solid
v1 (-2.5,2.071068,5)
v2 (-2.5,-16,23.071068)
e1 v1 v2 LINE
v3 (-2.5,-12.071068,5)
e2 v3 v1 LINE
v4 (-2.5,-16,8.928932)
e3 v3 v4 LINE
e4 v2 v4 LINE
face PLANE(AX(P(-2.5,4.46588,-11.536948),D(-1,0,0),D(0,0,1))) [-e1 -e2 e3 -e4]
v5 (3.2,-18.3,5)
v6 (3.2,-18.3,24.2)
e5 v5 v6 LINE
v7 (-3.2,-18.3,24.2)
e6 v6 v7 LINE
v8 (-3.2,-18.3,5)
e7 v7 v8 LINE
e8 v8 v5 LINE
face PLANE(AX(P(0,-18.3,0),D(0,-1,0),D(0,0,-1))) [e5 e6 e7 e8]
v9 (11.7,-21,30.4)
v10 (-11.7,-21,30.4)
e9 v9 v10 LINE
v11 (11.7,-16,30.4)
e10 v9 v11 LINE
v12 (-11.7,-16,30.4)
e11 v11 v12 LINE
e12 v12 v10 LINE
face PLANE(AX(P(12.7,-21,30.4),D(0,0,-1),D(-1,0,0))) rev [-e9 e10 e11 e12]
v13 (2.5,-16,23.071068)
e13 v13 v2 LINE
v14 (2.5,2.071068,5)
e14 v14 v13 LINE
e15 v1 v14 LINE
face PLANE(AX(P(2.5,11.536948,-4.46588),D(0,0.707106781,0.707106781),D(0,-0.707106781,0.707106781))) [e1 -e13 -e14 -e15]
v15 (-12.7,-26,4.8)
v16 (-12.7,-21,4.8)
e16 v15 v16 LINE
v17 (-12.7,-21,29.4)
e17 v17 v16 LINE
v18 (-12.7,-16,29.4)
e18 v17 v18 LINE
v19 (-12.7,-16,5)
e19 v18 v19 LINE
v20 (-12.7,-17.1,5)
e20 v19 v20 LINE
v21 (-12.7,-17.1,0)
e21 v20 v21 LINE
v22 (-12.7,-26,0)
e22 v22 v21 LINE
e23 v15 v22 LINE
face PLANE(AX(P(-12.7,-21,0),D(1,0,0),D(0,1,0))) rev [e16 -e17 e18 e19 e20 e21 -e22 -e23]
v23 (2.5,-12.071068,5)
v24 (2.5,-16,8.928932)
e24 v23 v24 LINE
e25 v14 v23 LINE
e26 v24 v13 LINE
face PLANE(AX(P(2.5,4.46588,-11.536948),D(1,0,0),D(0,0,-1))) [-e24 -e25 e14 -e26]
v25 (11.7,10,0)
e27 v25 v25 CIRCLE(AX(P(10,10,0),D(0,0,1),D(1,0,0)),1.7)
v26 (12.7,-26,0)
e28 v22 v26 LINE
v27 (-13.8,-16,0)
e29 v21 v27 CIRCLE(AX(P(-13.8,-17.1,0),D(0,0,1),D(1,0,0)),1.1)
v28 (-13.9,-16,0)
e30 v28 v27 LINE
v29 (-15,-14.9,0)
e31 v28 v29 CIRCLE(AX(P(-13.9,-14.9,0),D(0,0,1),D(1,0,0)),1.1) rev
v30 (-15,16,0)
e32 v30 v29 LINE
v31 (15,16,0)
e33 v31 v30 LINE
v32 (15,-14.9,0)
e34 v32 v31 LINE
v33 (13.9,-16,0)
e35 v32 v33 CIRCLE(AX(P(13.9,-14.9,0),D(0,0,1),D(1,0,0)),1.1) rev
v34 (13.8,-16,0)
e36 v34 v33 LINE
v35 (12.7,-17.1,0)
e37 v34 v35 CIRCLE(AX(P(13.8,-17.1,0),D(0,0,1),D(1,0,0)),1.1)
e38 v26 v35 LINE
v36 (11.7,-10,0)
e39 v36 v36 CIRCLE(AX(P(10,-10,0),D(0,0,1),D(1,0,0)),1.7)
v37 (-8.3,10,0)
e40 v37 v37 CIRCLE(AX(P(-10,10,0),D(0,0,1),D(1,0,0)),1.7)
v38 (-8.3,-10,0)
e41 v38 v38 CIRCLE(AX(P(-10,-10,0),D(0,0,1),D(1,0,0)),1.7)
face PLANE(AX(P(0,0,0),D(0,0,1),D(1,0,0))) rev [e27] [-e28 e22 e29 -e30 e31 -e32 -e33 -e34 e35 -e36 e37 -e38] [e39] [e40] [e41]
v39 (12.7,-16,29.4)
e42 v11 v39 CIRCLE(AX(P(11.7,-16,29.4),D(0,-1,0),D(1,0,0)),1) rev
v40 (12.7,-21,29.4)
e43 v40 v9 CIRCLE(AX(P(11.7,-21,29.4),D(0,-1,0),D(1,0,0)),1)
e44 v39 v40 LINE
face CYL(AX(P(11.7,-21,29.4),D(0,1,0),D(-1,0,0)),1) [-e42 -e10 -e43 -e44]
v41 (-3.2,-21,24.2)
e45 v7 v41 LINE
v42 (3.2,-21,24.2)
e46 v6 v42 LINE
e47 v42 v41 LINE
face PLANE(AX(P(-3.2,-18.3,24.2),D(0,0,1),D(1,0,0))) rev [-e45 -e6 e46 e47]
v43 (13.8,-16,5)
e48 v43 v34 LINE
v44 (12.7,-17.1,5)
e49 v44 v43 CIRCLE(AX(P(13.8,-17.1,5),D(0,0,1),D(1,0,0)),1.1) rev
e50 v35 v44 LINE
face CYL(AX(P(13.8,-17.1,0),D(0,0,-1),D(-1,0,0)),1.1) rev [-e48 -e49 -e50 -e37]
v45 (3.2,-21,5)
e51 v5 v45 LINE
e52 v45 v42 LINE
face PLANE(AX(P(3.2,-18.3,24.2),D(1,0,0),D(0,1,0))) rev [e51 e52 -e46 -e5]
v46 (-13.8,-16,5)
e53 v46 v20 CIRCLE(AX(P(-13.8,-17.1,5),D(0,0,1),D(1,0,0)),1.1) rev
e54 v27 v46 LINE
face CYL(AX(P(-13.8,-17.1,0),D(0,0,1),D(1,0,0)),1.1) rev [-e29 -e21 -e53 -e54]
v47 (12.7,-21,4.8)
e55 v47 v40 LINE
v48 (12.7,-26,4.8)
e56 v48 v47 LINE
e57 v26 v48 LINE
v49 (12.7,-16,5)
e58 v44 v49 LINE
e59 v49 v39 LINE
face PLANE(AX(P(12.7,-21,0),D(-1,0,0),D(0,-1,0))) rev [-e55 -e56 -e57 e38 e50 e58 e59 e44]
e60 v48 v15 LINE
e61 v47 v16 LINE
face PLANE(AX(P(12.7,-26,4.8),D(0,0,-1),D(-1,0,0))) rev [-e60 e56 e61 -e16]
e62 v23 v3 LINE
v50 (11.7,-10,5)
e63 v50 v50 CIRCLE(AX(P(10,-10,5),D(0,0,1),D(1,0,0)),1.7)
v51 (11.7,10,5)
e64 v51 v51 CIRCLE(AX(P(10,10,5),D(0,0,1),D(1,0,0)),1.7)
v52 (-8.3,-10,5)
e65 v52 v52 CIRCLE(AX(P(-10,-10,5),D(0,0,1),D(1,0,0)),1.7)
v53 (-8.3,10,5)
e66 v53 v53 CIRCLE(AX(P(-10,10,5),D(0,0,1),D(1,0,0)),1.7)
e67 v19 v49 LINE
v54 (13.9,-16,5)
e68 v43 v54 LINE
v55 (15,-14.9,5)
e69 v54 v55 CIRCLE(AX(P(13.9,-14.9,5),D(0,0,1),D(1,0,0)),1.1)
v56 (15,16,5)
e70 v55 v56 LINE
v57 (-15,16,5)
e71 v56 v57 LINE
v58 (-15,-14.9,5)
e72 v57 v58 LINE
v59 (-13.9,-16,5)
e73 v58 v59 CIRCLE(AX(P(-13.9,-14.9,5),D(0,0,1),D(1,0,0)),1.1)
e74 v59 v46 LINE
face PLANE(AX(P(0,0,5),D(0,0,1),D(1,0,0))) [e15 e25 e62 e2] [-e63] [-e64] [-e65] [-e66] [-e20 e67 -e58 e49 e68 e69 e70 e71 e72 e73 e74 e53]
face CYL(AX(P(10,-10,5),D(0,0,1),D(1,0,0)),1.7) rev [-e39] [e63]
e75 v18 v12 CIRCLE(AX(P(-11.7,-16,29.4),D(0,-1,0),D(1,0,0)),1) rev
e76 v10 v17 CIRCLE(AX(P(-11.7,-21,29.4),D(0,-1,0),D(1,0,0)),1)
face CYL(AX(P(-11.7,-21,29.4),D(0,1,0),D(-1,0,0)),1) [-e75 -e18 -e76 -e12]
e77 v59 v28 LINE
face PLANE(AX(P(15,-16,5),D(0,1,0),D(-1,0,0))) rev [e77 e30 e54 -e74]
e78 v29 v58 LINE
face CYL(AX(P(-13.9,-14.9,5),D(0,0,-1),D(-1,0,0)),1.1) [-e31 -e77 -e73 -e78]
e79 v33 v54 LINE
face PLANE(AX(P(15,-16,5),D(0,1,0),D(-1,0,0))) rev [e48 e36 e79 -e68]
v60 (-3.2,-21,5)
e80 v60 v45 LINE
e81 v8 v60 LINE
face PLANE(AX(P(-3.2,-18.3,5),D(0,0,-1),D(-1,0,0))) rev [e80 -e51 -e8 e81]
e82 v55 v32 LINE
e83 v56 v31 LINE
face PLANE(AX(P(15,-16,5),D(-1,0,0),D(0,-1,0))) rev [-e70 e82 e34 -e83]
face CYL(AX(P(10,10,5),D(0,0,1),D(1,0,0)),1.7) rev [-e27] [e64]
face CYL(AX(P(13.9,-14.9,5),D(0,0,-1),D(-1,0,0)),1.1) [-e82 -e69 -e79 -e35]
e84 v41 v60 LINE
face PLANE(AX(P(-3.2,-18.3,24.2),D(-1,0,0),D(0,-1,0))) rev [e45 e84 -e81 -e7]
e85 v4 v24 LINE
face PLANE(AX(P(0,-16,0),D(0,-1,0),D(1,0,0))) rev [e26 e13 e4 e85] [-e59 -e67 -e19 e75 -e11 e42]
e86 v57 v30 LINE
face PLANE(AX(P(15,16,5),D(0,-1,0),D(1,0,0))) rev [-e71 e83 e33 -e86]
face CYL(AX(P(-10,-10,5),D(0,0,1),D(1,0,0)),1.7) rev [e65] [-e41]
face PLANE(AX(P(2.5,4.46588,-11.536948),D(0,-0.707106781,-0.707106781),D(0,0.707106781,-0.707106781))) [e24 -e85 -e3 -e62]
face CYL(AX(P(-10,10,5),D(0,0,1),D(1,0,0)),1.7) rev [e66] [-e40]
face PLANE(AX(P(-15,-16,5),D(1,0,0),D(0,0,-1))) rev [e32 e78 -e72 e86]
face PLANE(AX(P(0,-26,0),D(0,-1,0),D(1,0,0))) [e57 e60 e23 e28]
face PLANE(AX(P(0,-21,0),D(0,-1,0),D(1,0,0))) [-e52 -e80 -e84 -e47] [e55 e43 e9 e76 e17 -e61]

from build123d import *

# Parameters (mm, degrees)
SKETCH1_W                       = 30
SKETCH1_H                       = 32
BOSS_EXTRUDE1_DEPTH             = 5
M3_CLEARANCE_HOLE1_D            = 3.4
SKETCH5_W                       = 25.4
SKETCH5_H                       = 30.4
BOSS_EXTRUDE2_DEPTH             = 5
BOSS_EXTRUDE3_REACH             = 38.377
SKETCH8_W                       = 5
SKETCH8_H                       = 10
BOSS_EXTRUDE3_DIRECTION_2_REACH = 38.377
SKETCH10_W                      = 6.4
SKETCH10_H                      = 19.2
CUT_EXTRUDE1_DEPTH              = 2.7
FILLET1_R                       = 1
SKETCH12_W                      = 25.4
SKETCH12_H                      = 4.8
BOSS_EXTRUDE5_DEPTH             = 5
FILLET2_START                   = -1
FILLET2_DEPTH                   = 30.4
FILLET2_2_DEPTH                 = 5


with BuildPart() as part:
    # Sketch1 → Boss-Extrude1 (new body)
    with BuildSketch(Plane.XY):
        Rectangle(SKETCH1_W, SKETCH1_H)
    extrude(amount=BOSS_EXTRUDE1_DEPTH)

    # M3 Clearance Hole1 (through all)
    with Locations(Plane.XY.offset(5)):
        with Locations((-10, 10), (10, 10), (10, -10), (-10, -10)):
            Hole(M3_CLEARANCE_HOLE1_D / 2)

    # Sketch5 → Boss-Extrude2 (add)
    with BuildSketch(Plane.XZ.offset(16)):
        with Locations((0, 15.2)):
            Rectangle(SKETCH5_W, SKETCH5_H)
    extrude(amount=BOSS_EXTRUDE2_DEPTH)

    # Boss-Extrude3: up to this plane
    boss_extrude3_end = Plane(origin=(0, -16, 0), z_dir=(0, -1, 0))
    # Sketch8 → Boss-Extrude3 (add, up to the surface)
    with BuildSketch(Plane(origin=(0, -10.5, 10.5), x_dir=(1, 0, 0), z_dir=(0, -0.7071067811865475, 0.7071067811865477)), mode=Mode.PRIVATE) as boss_extrude3_sk1:
        Rectangle(SKETCH8_W, SKETCH8_H)
    boss_extrude3_tool1 = split(extrude(boss_extrude3_sk1.sketch, amount=BOSS_EXTRUDE3_REACH, mode=Mode.PRIVATE), bisect_by=boss_extrude3_end, keep=Keep.BOTH, mode=Mode.PRIVATE)
    add(boss_extrude3_tool1.solids().sort_by_distance((0, -10.5, 10.5))[0])

    # Boss-Extrude3 direction 2: up to this plane
    boss_extrude3_direction_2_end = Plane(origin=(0, 0, 5), z_dir=(0, 0, 1))
    # Sketch8 → Boss-Extrude3 direction 2 (add, up to the surface)
    with BuildSketch(Plane(origin=(0, -10.5, 10.5), x_dir=(1, 0, 0), z_dir=(0, -0.7071067811865475, 0.7071067811865477)), mode=Mode.PRIVATE) as boss_extrude3_direction_2_sk1:
        Rectangle(SKETCH8_W, SKETCH8_H)
    boss_extrude3_direction_2_tool1 = split(extrude(boss_extrude3_direction_2_sk1.sketch, amount=-BOSS_EXTRUDE3_DIRECTION_2_REACH, mode=Mode.PRIVATE), bisect_by=boss_extrude3_direction_2_end, keep=Keep.BOTH, mode=Mode.PRIVATE)
    add(boss_extrude3_direction_2_tool1.solids().sort_by_distance((0, -10.5, 10.5))[0])

    # Sketch10 → Cut-Extrude1 (cut)
    with BuildSketch(Plane.XZ.offset(21)):
        with Locations((0, 14.6)):
            Rectangle(SKETCH10_W, SKETCH10_H)
    extrude(amount=-CUT_EXTRUDE1_DEPTH, mode=Mode.SUBTRACT)

    # Fillet1
    fillet1_edges = [part.edges().sort_by_distance(p)[0] for p in [
        (12.7, -18.5, 30.4),
        (-12.7, -18.5, 30.4),
    ]]
    fillet(fillet1_edges, radius=FILLET1_R)

    # Sketch12 → Boss-Extrude5 (add)
    with BuildSketch(Plane.XZ.offset(21)):
        with Locations((0, 2.4)):
            Rectangle(SKETCH12_W, SKETCH12_H)
    extrude(amount=BOSS_EXTRUDE5_DEPTH)

    # Fillet2: read off the stored shape, not the designer's step
    # Fillet2 outline → Fillet2 (cut)
    with BuildSketch(Plane.XY.offset(FILLET2_START)):
        with BuildLine():
            Line((15, -16), (15, -14.9))
            ThreePointArc((15, -14.9), (14.677817459, -15.677817459), (13.9, -16))
            Line((13.9, -16), (15, -16))
        make_face()
        with BuildLine():
            Line((-15, -16), (-13.9, -16))
            ThreePointArc((-13.9, -16), (-14.677817459, -15.677817459), (-15, -14.9))
            Line((-15, -14.9), (-15, -16))
        make_face()
    extrude(amount=FILLET2_DEPTH, mode=Mode.SUBTRACT)

    # Fillet2 2 outline → Fillet2 2 (add)
    with BuildSketch(Plane.XY):
        with BuildLine():
            ThreePointArc((12.7, -17.1), (13.022182541, -16.322182541), (13.8, -16))
            Line((13.8, -16), (12.7, -16))
            Line((12.7, -16), (12.7, -17.1))
        make_face()
        with BuildLine():
            Line((-12.7, -16), (-13.8, -16))
            ThreePointArc((-13.8, -16), (-13.022182541, -16.322182541), (-12.7, -17.1))
            Line((-12.7, -17.1), (-12.7, -16))
        make_face()
    extrude(amount=FILLET2_2_DEPTH)


solid = part.part
